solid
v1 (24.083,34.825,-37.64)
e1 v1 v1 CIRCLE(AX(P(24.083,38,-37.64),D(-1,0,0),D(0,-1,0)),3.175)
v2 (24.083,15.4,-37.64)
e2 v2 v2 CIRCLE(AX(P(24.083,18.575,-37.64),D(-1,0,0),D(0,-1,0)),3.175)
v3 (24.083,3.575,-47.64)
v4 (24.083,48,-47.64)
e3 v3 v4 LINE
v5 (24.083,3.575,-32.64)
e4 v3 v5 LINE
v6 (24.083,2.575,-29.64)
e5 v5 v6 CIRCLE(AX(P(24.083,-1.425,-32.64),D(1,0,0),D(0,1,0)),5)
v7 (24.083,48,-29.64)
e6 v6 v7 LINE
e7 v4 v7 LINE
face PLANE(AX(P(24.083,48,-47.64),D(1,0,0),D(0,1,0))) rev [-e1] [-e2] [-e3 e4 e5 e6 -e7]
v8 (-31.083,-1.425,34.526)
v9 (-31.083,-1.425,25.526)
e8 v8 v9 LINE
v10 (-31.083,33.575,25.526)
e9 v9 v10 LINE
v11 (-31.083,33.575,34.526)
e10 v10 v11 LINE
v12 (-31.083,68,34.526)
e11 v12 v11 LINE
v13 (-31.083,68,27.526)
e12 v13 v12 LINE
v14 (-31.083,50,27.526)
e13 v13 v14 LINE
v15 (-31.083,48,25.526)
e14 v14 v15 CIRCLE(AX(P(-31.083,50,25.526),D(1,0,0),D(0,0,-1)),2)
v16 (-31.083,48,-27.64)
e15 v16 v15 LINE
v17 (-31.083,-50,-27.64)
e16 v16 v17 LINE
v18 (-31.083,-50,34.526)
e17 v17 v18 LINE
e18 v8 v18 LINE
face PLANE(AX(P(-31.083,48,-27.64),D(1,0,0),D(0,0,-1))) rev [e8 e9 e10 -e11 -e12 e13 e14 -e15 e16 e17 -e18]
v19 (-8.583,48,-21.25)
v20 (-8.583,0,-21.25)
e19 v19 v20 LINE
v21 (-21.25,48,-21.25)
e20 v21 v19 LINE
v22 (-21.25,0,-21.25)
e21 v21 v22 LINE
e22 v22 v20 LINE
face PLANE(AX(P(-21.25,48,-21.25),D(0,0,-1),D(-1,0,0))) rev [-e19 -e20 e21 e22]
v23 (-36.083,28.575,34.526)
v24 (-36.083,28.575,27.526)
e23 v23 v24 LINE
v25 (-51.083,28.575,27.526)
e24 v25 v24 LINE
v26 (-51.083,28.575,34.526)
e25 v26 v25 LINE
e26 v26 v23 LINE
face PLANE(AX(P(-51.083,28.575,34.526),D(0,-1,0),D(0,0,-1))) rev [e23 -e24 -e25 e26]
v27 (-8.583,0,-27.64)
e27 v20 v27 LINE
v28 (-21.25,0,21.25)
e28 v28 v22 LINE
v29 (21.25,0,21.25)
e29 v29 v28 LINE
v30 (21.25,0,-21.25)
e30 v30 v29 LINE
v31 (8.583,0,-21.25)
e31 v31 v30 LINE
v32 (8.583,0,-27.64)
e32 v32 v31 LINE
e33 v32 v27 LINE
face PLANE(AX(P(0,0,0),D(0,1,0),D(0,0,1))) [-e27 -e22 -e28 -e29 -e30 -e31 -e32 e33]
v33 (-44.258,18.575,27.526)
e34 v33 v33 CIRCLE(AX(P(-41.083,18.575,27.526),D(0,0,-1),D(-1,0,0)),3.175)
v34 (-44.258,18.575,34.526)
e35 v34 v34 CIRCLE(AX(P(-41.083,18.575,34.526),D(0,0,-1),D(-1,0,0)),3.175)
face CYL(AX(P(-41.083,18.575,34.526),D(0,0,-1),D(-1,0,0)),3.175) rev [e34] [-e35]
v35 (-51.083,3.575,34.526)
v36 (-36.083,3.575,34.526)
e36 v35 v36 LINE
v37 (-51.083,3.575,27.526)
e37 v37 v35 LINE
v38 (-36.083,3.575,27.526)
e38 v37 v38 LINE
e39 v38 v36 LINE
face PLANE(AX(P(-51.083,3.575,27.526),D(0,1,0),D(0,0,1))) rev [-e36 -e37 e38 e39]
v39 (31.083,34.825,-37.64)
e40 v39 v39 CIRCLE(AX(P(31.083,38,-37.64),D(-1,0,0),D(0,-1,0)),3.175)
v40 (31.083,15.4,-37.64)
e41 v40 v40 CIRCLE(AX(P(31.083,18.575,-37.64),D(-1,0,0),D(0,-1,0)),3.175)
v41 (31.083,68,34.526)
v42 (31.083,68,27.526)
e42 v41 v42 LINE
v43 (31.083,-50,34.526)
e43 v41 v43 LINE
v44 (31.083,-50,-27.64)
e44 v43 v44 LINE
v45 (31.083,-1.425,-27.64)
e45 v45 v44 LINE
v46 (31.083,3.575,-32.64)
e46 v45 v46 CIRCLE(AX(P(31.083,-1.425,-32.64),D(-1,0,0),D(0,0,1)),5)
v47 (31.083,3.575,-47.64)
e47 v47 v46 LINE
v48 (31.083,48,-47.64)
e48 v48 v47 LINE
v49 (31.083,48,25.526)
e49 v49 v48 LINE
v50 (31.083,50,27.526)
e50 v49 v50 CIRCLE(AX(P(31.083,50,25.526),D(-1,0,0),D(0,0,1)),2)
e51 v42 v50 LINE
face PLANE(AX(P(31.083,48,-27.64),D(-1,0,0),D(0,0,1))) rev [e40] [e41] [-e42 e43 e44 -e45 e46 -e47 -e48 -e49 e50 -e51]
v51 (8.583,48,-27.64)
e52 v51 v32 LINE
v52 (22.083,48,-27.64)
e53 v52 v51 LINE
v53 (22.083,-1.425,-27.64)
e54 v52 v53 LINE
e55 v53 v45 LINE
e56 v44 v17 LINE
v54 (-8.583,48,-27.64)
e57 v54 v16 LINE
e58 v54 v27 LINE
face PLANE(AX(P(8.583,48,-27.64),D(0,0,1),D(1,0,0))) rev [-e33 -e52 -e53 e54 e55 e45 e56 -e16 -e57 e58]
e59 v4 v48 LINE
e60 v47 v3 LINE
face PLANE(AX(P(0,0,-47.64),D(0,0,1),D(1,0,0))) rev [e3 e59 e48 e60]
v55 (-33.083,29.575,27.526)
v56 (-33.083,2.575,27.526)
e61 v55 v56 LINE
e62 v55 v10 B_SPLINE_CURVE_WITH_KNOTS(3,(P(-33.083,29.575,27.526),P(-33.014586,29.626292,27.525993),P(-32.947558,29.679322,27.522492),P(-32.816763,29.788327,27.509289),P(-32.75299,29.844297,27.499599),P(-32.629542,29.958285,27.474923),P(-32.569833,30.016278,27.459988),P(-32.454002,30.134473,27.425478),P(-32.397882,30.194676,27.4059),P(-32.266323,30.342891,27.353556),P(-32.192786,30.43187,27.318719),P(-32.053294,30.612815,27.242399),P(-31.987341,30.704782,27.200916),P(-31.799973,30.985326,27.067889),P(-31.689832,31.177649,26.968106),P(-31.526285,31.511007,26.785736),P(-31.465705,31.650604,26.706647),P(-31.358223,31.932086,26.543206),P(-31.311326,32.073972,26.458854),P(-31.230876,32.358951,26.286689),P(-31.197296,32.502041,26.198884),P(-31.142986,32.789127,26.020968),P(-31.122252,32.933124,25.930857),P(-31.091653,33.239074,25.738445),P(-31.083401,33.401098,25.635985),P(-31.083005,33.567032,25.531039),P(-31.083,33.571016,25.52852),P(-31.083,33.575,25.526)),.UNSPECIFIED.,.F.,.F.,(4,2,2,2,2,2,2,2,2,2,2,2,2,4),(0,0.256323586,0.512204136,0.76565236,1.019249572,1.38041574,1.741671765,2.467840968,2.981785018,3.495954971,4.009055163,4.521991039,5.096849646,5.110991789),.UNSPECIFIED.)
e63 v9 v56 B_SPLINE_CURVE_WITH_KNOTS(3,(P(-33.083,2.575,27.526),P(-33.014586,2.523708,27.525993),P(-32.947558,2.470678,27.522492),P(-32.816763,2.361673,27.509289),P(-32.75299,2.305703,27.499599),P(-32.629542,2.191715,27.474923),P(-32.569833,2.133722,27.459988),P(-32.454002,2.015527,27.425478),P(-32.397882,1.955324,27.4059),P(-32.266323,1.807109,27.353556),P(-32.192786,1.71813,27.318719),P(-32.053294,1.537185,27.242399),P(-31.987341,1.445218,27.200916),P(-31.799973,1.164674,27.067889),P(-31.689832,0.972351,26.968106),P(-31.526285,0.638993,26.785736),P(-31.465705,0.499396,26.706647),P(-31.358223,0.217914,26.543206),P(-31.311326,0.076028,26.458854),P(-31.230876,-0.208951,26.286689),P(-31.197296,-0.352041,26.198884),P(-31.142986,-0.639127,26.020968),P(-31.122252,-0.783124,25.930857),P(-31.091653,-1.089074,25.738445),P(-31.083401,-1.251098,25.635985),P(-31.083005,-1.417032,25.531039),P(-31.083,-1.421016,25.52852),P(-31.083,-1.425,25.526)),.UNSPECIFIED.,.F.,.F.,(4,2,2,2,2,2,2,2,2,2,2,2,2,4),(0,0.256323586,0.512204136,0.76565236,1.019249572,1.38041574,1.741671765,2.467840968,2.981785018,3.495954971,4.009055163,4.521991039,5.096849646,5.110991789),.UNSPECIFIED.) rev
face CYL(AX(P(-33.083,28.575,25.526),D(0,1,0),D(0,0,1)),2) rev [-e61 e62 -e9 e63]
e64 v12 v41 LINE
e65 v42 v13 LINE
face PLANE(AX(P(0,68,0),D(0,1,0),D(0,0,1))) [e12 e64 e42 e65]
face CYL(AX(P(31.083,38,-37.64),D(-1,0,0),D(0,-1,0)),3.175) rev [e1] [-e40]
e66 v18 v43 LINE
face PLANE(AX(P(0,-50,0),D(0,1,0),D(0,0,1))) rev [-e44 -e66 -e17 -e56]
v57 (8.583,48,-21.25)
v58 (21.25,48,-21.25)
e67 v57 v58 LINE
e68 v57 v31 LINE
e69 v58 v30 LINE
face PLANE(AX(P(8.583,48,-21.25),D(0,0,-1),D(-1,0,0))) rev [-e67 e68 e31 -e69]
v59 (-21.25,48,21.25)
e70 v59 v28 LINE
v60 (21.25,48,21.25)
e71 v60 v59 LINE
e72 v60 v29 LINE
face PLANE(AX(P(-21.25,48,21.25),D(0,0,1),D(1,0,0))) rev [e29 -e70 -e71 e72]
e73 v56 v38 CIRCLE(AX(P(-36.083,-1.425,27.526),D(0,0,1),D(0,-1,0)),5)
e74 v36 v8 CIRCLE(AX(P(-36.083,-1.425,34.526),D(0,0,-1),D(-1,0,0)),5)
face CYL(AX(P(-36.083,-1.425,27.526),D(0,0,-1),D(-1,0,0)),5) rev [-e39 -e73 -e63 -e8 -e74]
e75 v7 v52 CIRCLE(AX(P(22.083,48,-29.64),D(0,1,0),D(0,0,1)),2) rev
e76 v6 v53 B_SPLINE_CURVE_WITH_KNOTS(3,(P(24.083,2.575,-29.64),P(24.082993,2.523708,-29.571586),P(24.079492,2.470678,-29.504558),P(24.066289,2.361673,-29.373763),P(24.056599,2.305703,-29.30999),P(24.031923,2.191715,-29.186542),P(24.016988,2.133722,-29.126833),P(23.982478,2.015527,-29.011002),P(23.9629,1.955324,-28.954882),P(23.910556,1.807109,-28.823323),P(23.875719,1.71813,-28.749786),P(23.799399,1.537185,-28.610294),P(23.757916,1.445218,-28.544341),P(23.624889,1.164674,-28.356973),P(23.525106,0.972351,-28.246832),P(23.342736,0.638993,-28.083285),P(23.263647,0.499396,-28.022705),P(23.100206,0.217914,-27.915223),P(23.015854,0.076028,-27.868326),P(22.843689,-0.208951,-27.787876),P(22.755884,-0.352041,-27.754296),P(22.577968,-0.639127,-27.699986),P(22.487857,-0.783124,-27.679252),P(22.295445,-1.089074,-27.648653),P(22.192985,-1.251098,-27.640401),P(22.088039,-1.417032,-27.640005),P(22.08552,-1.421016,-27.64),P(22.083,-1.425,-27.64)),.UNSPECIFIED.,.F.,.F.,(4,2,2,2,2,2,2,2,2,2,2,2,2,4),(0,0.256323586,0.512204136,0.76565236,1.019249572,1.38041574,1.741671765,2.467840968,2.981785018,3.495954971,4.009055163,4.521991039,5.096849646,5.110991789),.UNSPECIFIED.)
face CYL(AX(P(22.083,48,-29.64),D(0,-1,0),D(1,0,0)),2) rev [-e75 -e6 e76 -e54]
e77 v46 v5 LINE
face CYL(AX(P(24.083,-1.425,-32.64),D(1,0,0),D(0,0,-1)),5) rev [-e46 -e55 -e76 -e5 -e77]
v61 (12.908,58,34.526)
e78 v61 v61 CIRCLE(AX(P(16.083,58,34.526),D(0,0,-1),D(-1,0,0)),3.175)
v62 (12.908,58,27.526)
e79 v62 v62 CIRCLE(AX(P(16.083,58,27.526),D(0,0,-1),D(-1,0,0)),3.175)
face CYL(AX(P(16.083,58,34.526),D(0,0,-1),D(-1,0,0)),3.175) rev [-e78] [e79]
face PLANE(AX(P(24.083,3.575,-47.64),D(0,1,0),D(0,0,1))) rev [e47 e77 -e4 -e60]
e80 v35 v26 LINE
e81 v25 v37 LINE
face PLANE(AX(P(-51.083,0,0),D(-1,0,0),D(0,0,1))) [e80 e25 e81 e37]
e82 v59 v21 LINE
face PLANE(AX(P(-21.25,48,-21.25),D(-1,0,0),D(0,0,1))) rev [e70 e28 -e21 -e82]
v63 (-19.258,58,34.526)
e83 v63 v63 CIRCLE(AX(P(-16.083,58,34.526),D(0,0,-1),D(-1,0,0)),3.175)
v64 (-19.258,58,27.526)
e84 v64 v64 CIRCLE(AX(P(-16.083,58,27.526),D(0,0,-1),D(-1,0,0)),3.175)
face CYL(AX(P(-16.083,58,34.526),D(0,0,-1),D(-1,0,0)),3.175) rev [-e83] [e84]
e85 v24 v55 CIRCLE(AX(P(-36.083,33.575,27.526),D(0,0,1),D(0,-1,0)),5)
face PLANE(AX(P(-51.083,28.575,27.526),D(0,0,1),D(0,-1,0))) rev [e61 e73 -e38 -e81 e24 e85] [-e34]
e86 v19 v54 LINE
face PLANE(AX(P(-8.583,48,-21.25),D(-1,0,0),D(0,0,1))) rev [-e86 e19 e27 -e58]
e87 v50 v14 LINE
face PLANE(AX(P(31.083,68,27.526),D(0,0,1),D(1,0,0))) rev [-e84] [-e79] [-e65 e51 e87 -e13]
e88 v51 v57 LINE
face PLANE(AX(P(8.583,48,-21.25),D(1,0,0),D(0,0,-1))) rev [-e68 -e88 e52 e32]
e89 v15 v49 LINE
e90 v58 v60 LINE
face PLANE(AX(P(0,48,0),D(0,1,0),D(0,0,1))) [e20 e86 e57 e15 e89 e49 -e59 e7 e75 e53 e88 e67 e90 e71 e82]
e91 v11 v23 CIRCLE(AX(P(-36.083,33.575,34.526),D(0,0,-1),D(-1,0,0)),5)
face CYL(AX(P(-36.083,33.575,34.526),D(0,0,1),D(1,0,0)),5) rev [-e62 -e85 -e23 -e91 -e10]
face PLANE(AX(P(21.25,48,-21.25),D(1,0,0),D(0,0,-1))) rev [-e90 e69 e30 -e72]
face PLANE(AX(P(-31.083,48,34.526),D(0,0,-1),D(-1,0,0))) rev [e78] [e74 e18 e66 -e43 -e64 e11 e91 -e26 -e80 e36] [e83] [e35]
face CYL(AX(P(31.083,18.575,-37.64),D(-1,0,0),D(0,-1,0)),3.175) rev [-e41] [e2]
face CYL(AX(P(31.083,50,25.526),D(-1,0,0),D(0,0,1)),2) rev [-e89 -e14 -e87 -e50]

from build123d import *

# Parameters (mm, degrees)
BOSS_EXTRUDE1_DEPTH = 48
SKETCH2_W           = 62.166
SKETCH2_H           = 62.166
BOSS_EXTRUDE2_DEPTH = 50
SKETCH5_W           = 7
SKETCH5_H           = 44.425
BOSS_EXTRUDE3_DEPTH = 20
SKETCH8_W           = 62.166
SKETCH8_H           = 7
BOSS_EXTRUDE4_DEPTH = 20
SKETCH10_W          = 7
SKETCH10_H          = 25
BOSS_EXTRUDE5_DEPTH = 20
SKETCH7_R           = 3.175
CUT_EXTRUDE1_DEPTH  = 112.997755
SKETCH9_R           = 3.175
CUT_EXTRUDE2_DEPTH  = 114.505068
SKETCH11_R          = 3.175
CUT_EXTRUDE3_DEPTH  = 114.505068
FILLET1_R           = 2
FILLET2_START       = 25.526
FILLET2_DEPTH       = 9
FILLET2_START_2     = 22.083
FILLET2_2_DEPTH     = 9
FILLET2_START_3     = -2
FILLET2_3_DEPTH     = 37


with BuildPart() as part:
    # Sketch1 → Boss-Extrude1 (new body)
    with BuildSketch(Plane(origin=(0, 0, 0), x_dir=(1, 0, 0), z_dir=(0, 1, 0))):
        Polygon((8.583, 21.25), (8.583, 27.64), (31.083, 27.64), (31.083, -34.526), (-31.083, -34.526), (-31.083, 27.64), (-8.583, 27.64), (-8.583, 21.25), (-21.25, 21.25), (-21.25, -21.25), (21.25, -21.25), (21.25, 21.25), align=None)
    extrude(amount=BOSS_EXTRUDE1_DEPTH)

    # Sketch2 → Boss-Extrude2 (add)
    with BuildSketch(Plane(origin=(0, 0, 0), x_dir=(1, 0, 0), z_dir=(0, 1, 0))):
        with Locations((0, -3.443)):
            Rectangle(SKETCH2_W, SKETCH2_H)
    extrude(amount=-BOSS_EXTRUDE2_DEPTH)

    # Sketch5 → Boss-Extrude3 (add)
    with BuildSketch(Plane(origin=(0, 0, -27.64), x_dir=(-1, 0, 0), z_dir=(0, 0, -1))):
        with Locations((-27.583, 25.7875)):
            Rectangle(SKETCH5_W, SKETCH5_H)
    extrude(amount=BOSS_EXTRUDE3_DEPTH)

    # Sketch8 → Boss-Extrude4 (add)
    with BuildSketch(Plane(origin=(0, 48, 0), x_dir=(1, 0, 0), z_dir=(0, 1, 0))):
        with Locations((0, -31.026)):
            Rectangle(SKETCH8_W, SKETCH8_H)
    extrude(amount=BOSS_EXTRUDE4_DEPTH)

    # Sketch10 → Boss-Extrude5 (add)
    with BuildSketch(Plane.ZY.offset(31.083)):
        with Locations((31.026, 16.075)):
            Rectangle(SKETCH10_W, SKETCH10_H)
    extrude(amount=BOSS_EXTRUDE5_DEPTH)

    # Sketch7 → Cut-Extrude1 (cut, through all)
    with BuildSketch(Plane.ZY.offset(-24.083)):
        with Locations(Location((-37.64, 38, 0), (0, 0, 270))):
            Circle(SKETCH7_R)
        with Locations(Location((-37.64, 18.575, 0), (0, 0, 270))):
            Circle(SKETCH7_R)
    extrude(amount=-CUT_EXTRUDE1_DEPTH, mode=Mode.SUBTRACT)

    # Sketch9 → Cut-Extrude2 (cut, through all)
    with BuildSketch(Plane(origin=(0, 0, 27.526), x_dir=(-1, 0, 0), z_dir=(0, 0, -1))):
        with Locations((-16.083, 58)):
            Circle(SKETCH9_R)
        with Locations((16.083, 58)):
            Circle(SKETCH9_R)
    extrude(amount=-CUT_EXTRUDE2_DEPTH, mode=Mode.SUBTRACT)

    # Sketch11 → Cut-Extrude3 (cut, through all)
    with BuildSketch(Plane(origin=(0, 0, 27.526), x_dir=(-1, 0, 0), z_dir=(0, 0, -1))):
        with Locations((41.083, 18.575)):
            Circle(SKETCH11_R)
    extrude(amount=-CUT_EXTRUDE3_DEPTH, mode=Mode.SUBTRACT)

    # Fillet1
    # the kernel refuses this fillet: 2 mm, written as the material it adds along each edge
    with BuildSketch(Plane(origin=(31.083, 48, 27.526), x_dir=(0, 0, -1), z_dir=(-1, 0, 0))) as fillet1_piece_1:
        with BuildLine():
            CenterArc((FILLET1_R, -FILLET1_R), FILLET1_R, 90, 90)
            Line((0, -FILLET1_R), (0, 0))
            Line((0, 0), (FILLET1_R, 0))
        make_face()
    extrude(amount=62.166)
    with BuildSketch(Plane(origin=(-31.083, 28.575, 27.526), x_dir=(0, 0, -1), z_dir=(0, -1, 0))) as fillet1_piece_2:
        with BuildLine():
            CenterArc((FILLET1_R, -FILLET1_R), FILLET1_R, 90, 90)
            Line((0, -FILLET1_R), (0, 0))
            Line((0, 0), (FILLET1_R, 0))
        make_face()
    extrude(amount=25)
    with BuildSketch(Plane(origin=(24.083, 48, -27.64), x_dir=(-1, 0, 0), z_dir=(0, -1, 0))) as fillet1_piece_3:
        with BuildLine():
            CenterArc((FILLET1_R, FILLET1_R), FILLET1_R, 180, 90)
            Line((0, FILLET1_R), (0, 0))
            Line((0, 0), (FILLET1_R, 0))
        make_face()
    extrude(amount=44.425)

    # Fillet2: read off the stored shape, not the designer's step
    # Fillet2 outline → Fillet2 (add)
    with BuildSketch(Plane.XY.offset(FILLET2_START)):
        with BuildLine():
            Line((-31.083, -1.425), (-31.083, 3.575))
            Line((-31.083, 3.575), (-36.083, 3.575))
            ThreePointArc((-36.083, 3.575), (-32.547466, 2.110534), (-31.083, -1.425))
        make_face()
        with BuildLine():
            ThreePointArc((-31.083, 33.575), (-32.547466, 30.039466), (-36.083, 28.575))
            Line((-36.083, 28.575), (-31.083, 28.575))
            Line((-31.083, 28.575), (-31.083, 33.575))
        make_face()
    extrude(amount=FILLET2_DEPTH)

    # Fillet2 2 outline → Fillet2 2 (add)
    with BuildSketch(Plane.YZ.offset(FILLET2_START_2)):
        with BuildLine():
            ThreePointArc((-1.425, -27.64), (2.110534, -29.104466), (3.575, -32.64))
            Line((3.575, -32.64), (3.575, -27.64))
            Line((3.575, -27.64), (-1.425, -27.64))
        make_face()
    extrude(amount=FILLET2_2_DEPTH)

    # Fillet2 3 outline → Fillet2 3 (cut)
    with BuildSketch(Plane(origin=(0, 0, 0), x_dir=(1, 0, 0), z_dir=(0, 1, 0)).offset(FILLET2_START_3)):
        with BuildLine():
            ThreePointArc((-33.083, -27.526), (-31.668786, -26.940214), (-31.083, -25.526))
            Line((-31.083, -25.526), (-36.083, -25.526))
            Line((-36.083, -25.526), (-36.083, -27.526))
            Line((-36.083, -27.526), (-33.083, -27.526))
        make_face()
        with BuildLine():
            Line((24.083, 32.64), (22.083, 32.64))
            Line((22.083, 32.64), (22.083, 27.64))
            ThreePointArc((22.083, 27.64), (23.497214, 28.225786), (24.083, 29.64))
            Line((24.083, 29.64), (24.083, 32.64))
        make_face()
    extrude(amount=FILLET2_3_DEPTH, mode=Mode.SUBTRACT)


solid = part.part
